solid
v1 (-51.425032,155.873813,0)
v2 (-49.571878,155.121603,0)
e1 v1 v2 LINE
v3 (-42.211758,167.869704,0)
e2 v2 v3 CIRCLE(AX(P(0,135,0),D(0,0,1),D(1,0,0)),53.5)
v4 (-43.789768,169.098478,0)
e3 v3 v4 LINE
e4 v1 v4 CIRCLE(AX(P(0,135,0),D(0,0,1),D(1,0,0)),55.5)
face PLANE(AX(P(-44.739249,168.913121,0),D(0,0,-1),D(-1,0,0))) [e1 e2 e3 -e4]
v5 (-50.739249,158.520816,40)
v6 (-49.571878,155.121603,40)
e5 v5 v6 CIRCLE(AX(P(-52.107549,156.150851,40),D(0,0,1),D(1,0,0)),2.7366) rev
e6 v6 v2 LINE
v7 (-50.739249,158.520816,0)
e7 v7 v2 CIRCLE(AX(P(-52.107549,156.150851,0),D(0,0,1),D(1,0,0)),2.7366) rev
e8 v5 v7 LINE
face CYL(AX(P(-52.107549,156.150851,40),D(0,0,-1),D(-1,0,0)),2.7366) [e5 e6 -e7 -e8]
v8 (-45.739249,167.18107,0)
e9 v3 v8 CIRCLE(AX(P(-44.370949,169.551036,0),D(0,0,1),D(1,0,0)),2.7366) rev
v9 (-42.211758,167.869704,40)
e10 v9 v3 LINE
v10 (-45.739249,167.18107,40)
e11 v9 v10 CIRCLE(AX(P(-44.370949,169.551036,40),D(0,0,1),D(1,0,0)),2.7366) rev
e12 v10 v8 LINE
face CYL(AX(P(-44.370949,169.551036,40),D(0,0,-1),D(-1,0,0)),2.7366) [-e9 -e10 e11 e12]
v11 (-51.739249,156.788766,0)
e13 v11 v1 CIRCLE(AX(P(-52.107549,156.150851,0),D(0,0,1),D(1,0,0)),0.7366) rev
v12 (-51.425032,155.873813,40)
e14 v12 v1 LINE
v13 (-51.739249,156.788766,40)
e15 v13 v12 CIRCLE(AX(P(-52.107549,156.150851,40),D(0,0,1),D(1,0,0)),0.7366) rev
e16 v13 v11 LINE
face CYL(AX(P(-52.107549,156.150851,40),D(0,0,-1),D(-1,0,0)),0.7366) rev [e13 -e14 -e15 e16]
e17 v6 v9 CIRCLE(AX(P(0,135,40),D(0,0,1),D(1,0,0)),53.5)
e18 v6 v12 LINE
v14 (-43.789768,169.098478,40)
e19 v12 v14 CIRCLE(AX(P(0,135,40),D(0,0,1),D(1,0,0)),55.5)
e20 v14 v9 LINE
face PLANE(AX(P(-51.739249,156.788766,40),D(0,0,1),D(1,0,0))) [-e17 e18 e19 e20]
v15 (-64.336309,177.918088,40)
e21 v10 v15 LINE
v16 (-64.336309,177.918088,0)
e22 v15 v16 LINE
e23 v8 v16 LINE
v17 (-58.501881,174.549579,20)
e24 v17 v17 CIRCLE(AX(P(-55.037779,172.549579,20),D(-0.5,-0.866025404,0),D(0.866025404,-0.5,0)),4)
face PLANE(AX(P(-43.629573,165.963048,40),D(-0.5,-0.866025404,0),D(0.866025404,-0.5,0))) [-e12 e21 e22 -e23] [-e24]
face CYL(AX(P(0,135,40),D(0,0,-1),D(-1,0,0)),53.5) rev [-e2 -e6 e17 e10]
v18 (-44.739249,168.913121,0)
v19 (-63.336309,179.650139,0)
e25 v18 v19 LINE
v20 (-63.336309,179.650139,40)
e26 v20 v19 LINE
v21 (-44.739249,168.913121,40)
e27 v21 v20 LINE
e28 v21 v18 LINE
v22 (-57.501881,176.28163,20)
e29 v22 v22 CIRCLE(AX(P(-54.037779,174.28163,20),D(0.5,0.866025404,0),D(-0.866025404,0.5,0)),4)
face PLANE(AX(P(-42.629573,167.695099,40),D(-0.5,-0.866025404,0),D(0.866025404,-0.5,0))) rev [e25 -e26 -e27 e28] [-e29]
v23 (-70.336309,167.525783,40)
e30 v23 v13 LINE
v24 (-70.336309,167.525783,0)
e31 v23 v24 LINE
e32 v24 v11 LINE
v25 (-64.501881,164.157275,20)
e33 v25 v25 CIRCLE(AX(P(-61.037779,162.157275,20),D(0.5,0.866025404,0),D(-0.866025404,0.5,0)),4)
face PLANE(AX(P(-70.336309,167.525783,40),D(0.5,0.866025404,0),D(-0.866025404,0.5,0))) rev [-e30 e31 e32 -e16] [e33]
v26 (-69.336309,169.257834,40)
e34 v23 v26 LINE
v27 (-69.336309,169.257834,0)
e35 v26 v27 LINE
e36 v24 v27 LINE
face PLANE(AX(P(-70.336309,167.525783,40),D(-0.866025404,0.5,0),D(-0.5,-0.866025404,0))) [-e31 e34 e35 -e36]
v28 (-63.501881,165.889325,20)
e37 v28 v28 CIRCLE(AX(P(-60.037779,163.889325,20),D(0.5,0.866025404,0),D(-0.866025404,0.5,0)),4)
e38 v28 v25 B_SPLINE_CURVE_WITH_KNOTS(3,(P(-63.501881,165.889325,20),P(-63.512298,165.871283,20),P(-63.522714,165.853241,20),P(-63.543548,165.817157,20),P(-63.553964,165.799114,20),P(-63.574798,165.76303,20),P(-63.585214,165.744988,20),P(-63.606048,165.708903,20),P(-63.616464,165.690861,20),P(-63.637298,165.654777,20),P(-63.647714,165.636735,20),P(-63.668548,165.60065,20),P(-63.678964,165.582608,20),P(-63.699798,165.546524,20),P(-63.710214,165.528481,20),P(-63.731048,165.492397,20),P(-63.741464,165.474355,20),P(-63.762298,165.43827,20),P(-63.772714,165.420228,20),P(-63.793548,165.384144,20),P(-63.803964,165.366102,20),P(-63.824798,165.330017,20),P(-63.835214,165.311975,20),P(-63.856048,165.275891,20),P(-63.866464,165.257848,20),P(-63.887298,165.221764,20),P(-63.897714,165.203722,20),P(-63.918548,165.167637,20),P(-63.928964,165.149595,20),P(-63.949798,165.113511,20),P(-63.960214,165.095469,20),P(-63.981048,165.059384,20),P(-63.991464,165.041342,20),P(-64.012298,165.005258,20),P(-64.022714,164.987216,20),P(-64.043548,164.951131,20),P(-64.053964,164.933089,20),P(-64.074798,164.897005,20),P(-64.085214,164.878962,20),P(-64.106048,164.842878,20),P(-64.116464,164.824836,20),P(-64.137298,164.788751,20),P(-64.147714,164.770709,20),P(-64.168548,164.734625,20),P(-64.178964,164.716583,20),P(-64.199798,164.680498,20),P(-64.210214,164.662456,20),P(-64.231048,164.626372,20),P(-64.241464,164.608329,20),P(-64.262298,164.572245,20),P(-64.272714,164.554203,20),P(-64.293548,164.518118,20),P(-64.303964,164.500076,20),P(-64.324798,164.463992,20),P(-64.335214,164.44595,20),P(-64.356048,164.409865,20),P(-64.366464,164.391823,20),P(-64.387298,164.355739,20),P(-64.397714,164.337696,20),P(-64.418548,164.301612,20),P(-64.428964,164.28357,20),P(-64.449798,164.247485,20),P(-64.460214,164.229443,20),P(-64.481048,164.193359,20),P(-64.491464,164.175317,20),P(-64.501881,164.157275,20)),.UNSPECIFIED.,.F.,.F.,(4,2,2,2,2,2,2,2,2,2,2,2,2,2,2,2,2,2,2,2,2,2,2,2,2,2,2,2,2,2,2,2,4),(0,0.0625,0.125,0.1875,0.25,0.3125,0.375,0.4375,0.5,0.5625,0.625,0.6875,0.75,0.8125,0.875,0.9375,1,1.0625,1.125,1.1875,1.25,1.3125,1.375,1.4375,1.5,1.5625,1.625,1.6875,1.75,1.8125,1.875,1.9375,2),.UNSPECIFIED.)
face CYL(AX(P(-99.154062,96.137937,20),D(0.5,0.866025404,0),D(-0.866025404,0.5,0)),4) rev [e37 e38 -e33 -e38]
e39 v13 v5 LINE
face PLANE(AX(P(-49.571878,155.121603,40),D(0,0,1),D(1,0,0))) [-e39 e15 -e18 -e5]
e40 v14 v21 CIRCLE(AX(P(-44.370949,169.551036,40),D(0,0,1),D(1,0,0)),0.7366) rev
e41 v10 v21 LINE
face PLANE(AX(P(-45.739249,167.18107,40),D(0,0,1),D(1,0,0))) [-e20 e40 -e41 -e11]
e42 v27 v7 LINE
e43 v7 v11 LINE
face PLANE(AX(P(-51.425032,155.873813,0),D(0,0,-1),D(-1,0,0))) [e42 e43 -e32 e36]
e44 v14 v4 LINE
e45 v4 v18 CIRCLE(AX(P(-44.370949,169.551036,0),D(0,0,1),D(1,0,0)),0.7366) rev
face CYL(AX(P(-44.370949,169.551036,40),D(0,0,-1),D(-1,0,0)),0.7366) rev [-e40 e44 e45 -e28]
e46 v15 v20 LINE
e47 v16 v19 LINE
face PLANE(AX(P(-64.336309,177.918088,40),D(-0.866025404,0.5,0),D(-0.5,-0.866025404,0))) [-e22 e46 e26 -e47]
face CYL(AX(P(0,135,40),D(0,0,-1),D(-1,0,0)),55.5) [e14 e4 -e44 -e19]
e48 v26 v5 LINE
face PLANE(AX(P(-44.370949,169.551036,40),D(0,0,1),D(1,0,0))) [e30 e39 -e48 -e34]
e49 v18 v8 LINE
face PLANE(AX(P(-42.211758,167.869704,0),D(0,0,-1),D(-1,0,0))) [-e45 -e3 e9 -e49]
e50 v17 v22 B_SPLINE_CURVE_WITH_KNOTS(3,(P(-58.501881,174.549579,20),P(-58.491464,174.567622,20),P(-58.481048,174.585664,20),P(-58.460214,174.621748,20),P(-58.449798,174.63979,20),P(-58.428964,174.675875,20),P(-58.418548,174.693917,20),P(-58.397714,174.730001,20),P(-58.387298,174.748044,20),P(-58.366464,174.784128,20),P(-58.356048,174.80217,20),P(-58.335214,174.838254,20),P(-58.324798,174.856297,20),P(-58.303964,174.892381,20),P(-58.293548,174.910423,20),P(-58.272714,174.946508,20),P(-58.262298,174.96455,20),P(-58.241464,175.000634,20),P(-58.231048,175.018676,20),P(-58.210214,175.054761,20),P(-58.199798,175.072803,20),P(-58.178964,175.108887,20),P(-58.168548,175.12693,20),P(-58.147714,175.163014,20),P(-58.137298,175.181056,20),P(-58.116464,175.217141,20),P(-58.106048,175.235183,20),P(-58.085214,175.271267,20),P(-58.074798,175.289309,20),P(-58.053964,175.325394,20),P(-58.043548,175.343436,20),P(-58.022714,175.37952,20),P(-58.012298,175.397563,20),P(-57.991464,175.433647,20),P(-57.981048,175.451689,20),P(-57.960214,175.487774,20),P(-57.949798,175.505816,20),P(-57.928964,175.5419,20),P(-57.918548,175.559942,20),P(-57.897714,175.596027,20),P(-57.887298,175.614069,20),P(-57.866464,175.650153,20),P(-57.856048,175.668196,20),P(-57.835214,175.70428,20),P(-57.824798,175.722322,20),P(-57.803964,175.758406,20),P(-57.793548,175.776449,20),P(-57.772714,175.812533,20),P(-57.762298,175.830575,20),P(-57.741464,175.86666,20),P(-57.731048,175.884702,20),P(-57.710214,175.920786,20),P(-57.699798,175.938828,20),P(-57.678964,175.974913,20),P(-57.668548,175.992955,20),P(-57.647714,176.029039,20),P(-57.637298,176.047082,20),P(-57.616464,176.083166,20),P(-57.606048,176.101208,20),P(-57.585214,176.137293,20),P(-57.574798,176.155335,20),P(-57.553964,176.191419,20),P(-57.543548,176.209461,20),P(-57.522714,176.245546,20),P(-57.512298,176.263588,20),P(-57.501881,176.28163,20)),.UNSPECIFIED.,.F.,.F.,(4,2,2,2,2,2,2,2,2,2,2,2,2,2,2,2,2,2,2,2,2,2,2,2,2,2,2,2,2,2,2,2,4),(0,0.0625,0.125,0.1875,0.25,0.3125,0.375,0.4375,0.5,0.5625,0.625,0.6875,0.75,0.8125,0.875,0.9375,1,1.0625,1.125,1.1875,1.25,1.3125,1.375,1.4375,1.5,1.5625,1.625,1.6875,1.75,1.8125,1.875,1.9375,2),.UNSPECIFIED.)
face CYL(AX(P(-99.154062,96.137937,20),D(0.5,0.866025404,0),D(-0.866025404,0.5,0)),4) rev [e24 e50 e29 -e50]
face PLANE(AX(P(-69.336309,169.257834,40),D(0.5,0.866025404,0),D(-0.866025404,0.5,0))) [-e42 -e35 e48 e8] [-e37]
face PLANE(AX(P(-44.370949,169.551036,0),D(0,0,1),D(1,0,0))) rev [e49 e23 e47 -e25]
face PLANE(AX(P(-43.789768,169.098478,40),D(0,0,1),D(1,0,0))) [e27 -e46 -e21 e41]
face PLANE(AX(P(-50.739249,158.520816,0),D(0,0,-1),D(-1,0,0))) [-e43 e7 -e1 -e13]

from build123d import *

# Parameters (mm, degrees)
SM_BASE_FLANGE_1_DEPTH = 40
SKETCH_6_R             = 4
CUT_EXTRUDE_1_DEPTH    = 162.312299626


# Read off the part's stored shape, not the designer's step: Базовая кромка1
with BuildPart() as part:
    # Базовая кромка1 outline → Базовая кромка1 (new body)
    with BuildSketch(Plane.XY):
        with BuildLine():
            Line((-44.739249061, 168.913121258), (-63.336309448, 179.650139078))
            Line((-63.336309448, 179.650139078), (-64.336309448, 177.91808827))
            Line((-64.336309448, 177.91808827), (-45.739249061, 167.18107045))
            ThreePointArc((-45.739249061, 167.18107045), (-43.846610356, 166.865137493), (-42.211758442, 167.869704125))
            ThreePointArc((-42.211758442, 167.869704125), (46.332359104, 108.250000003), (-49.571878008, 155.121603086))
            ThreePointArc((-49.571878008, 155.121603086), (-49.519323742, 157.039709692), (-50.739249061, 158.520816412))
            Line((-50.739249061, 158.520816412), (-69.336309448, 169.257834232))
            Line((-69.336309448, 169.257834232), (-70.336309448, 167.525783425))
            Line((-70.336309448, 167.525783425), (-51.739249061, 156.788765605))
            ThreePointArc((-51.739249061, 156.788765605), (-51.410886498, 156.390101858), (-51.425032326, 155.873812548))
            ThreePointArc((-51.425032326, 155.873812548), (48.064409909, 107.249999999), (-43.789768103, 169.098478111))
            ThreePointArc((-43.789768103, 169.098478111), (-44.229814847, 168.82808281), (-44.739249061, 168.913121258))
        make_face()
    extrude(amount=SM_BASE_FLANGE_1_DEPTH)

    # Эскиз6 → Вырез-Вытянуть1 (cut, through all)
    with BuildSketch(Plane(origin=(61.956714755, 107.312177826, 0), x_dir=(0.8660254037844433, -0.499999999999992, 0), z_dir=(0.499999999999992, 0.8660254037844433, 0))):
        with Locations(Location((-133.938904682, -20, 0), (0, 0, 180))):
            Circle(SKETCH_6_R)
    extrude(amount=-CUT_EXTRUDE_1_DEPTH, mode=Mode.SUBTRACT)


solid = part.part
